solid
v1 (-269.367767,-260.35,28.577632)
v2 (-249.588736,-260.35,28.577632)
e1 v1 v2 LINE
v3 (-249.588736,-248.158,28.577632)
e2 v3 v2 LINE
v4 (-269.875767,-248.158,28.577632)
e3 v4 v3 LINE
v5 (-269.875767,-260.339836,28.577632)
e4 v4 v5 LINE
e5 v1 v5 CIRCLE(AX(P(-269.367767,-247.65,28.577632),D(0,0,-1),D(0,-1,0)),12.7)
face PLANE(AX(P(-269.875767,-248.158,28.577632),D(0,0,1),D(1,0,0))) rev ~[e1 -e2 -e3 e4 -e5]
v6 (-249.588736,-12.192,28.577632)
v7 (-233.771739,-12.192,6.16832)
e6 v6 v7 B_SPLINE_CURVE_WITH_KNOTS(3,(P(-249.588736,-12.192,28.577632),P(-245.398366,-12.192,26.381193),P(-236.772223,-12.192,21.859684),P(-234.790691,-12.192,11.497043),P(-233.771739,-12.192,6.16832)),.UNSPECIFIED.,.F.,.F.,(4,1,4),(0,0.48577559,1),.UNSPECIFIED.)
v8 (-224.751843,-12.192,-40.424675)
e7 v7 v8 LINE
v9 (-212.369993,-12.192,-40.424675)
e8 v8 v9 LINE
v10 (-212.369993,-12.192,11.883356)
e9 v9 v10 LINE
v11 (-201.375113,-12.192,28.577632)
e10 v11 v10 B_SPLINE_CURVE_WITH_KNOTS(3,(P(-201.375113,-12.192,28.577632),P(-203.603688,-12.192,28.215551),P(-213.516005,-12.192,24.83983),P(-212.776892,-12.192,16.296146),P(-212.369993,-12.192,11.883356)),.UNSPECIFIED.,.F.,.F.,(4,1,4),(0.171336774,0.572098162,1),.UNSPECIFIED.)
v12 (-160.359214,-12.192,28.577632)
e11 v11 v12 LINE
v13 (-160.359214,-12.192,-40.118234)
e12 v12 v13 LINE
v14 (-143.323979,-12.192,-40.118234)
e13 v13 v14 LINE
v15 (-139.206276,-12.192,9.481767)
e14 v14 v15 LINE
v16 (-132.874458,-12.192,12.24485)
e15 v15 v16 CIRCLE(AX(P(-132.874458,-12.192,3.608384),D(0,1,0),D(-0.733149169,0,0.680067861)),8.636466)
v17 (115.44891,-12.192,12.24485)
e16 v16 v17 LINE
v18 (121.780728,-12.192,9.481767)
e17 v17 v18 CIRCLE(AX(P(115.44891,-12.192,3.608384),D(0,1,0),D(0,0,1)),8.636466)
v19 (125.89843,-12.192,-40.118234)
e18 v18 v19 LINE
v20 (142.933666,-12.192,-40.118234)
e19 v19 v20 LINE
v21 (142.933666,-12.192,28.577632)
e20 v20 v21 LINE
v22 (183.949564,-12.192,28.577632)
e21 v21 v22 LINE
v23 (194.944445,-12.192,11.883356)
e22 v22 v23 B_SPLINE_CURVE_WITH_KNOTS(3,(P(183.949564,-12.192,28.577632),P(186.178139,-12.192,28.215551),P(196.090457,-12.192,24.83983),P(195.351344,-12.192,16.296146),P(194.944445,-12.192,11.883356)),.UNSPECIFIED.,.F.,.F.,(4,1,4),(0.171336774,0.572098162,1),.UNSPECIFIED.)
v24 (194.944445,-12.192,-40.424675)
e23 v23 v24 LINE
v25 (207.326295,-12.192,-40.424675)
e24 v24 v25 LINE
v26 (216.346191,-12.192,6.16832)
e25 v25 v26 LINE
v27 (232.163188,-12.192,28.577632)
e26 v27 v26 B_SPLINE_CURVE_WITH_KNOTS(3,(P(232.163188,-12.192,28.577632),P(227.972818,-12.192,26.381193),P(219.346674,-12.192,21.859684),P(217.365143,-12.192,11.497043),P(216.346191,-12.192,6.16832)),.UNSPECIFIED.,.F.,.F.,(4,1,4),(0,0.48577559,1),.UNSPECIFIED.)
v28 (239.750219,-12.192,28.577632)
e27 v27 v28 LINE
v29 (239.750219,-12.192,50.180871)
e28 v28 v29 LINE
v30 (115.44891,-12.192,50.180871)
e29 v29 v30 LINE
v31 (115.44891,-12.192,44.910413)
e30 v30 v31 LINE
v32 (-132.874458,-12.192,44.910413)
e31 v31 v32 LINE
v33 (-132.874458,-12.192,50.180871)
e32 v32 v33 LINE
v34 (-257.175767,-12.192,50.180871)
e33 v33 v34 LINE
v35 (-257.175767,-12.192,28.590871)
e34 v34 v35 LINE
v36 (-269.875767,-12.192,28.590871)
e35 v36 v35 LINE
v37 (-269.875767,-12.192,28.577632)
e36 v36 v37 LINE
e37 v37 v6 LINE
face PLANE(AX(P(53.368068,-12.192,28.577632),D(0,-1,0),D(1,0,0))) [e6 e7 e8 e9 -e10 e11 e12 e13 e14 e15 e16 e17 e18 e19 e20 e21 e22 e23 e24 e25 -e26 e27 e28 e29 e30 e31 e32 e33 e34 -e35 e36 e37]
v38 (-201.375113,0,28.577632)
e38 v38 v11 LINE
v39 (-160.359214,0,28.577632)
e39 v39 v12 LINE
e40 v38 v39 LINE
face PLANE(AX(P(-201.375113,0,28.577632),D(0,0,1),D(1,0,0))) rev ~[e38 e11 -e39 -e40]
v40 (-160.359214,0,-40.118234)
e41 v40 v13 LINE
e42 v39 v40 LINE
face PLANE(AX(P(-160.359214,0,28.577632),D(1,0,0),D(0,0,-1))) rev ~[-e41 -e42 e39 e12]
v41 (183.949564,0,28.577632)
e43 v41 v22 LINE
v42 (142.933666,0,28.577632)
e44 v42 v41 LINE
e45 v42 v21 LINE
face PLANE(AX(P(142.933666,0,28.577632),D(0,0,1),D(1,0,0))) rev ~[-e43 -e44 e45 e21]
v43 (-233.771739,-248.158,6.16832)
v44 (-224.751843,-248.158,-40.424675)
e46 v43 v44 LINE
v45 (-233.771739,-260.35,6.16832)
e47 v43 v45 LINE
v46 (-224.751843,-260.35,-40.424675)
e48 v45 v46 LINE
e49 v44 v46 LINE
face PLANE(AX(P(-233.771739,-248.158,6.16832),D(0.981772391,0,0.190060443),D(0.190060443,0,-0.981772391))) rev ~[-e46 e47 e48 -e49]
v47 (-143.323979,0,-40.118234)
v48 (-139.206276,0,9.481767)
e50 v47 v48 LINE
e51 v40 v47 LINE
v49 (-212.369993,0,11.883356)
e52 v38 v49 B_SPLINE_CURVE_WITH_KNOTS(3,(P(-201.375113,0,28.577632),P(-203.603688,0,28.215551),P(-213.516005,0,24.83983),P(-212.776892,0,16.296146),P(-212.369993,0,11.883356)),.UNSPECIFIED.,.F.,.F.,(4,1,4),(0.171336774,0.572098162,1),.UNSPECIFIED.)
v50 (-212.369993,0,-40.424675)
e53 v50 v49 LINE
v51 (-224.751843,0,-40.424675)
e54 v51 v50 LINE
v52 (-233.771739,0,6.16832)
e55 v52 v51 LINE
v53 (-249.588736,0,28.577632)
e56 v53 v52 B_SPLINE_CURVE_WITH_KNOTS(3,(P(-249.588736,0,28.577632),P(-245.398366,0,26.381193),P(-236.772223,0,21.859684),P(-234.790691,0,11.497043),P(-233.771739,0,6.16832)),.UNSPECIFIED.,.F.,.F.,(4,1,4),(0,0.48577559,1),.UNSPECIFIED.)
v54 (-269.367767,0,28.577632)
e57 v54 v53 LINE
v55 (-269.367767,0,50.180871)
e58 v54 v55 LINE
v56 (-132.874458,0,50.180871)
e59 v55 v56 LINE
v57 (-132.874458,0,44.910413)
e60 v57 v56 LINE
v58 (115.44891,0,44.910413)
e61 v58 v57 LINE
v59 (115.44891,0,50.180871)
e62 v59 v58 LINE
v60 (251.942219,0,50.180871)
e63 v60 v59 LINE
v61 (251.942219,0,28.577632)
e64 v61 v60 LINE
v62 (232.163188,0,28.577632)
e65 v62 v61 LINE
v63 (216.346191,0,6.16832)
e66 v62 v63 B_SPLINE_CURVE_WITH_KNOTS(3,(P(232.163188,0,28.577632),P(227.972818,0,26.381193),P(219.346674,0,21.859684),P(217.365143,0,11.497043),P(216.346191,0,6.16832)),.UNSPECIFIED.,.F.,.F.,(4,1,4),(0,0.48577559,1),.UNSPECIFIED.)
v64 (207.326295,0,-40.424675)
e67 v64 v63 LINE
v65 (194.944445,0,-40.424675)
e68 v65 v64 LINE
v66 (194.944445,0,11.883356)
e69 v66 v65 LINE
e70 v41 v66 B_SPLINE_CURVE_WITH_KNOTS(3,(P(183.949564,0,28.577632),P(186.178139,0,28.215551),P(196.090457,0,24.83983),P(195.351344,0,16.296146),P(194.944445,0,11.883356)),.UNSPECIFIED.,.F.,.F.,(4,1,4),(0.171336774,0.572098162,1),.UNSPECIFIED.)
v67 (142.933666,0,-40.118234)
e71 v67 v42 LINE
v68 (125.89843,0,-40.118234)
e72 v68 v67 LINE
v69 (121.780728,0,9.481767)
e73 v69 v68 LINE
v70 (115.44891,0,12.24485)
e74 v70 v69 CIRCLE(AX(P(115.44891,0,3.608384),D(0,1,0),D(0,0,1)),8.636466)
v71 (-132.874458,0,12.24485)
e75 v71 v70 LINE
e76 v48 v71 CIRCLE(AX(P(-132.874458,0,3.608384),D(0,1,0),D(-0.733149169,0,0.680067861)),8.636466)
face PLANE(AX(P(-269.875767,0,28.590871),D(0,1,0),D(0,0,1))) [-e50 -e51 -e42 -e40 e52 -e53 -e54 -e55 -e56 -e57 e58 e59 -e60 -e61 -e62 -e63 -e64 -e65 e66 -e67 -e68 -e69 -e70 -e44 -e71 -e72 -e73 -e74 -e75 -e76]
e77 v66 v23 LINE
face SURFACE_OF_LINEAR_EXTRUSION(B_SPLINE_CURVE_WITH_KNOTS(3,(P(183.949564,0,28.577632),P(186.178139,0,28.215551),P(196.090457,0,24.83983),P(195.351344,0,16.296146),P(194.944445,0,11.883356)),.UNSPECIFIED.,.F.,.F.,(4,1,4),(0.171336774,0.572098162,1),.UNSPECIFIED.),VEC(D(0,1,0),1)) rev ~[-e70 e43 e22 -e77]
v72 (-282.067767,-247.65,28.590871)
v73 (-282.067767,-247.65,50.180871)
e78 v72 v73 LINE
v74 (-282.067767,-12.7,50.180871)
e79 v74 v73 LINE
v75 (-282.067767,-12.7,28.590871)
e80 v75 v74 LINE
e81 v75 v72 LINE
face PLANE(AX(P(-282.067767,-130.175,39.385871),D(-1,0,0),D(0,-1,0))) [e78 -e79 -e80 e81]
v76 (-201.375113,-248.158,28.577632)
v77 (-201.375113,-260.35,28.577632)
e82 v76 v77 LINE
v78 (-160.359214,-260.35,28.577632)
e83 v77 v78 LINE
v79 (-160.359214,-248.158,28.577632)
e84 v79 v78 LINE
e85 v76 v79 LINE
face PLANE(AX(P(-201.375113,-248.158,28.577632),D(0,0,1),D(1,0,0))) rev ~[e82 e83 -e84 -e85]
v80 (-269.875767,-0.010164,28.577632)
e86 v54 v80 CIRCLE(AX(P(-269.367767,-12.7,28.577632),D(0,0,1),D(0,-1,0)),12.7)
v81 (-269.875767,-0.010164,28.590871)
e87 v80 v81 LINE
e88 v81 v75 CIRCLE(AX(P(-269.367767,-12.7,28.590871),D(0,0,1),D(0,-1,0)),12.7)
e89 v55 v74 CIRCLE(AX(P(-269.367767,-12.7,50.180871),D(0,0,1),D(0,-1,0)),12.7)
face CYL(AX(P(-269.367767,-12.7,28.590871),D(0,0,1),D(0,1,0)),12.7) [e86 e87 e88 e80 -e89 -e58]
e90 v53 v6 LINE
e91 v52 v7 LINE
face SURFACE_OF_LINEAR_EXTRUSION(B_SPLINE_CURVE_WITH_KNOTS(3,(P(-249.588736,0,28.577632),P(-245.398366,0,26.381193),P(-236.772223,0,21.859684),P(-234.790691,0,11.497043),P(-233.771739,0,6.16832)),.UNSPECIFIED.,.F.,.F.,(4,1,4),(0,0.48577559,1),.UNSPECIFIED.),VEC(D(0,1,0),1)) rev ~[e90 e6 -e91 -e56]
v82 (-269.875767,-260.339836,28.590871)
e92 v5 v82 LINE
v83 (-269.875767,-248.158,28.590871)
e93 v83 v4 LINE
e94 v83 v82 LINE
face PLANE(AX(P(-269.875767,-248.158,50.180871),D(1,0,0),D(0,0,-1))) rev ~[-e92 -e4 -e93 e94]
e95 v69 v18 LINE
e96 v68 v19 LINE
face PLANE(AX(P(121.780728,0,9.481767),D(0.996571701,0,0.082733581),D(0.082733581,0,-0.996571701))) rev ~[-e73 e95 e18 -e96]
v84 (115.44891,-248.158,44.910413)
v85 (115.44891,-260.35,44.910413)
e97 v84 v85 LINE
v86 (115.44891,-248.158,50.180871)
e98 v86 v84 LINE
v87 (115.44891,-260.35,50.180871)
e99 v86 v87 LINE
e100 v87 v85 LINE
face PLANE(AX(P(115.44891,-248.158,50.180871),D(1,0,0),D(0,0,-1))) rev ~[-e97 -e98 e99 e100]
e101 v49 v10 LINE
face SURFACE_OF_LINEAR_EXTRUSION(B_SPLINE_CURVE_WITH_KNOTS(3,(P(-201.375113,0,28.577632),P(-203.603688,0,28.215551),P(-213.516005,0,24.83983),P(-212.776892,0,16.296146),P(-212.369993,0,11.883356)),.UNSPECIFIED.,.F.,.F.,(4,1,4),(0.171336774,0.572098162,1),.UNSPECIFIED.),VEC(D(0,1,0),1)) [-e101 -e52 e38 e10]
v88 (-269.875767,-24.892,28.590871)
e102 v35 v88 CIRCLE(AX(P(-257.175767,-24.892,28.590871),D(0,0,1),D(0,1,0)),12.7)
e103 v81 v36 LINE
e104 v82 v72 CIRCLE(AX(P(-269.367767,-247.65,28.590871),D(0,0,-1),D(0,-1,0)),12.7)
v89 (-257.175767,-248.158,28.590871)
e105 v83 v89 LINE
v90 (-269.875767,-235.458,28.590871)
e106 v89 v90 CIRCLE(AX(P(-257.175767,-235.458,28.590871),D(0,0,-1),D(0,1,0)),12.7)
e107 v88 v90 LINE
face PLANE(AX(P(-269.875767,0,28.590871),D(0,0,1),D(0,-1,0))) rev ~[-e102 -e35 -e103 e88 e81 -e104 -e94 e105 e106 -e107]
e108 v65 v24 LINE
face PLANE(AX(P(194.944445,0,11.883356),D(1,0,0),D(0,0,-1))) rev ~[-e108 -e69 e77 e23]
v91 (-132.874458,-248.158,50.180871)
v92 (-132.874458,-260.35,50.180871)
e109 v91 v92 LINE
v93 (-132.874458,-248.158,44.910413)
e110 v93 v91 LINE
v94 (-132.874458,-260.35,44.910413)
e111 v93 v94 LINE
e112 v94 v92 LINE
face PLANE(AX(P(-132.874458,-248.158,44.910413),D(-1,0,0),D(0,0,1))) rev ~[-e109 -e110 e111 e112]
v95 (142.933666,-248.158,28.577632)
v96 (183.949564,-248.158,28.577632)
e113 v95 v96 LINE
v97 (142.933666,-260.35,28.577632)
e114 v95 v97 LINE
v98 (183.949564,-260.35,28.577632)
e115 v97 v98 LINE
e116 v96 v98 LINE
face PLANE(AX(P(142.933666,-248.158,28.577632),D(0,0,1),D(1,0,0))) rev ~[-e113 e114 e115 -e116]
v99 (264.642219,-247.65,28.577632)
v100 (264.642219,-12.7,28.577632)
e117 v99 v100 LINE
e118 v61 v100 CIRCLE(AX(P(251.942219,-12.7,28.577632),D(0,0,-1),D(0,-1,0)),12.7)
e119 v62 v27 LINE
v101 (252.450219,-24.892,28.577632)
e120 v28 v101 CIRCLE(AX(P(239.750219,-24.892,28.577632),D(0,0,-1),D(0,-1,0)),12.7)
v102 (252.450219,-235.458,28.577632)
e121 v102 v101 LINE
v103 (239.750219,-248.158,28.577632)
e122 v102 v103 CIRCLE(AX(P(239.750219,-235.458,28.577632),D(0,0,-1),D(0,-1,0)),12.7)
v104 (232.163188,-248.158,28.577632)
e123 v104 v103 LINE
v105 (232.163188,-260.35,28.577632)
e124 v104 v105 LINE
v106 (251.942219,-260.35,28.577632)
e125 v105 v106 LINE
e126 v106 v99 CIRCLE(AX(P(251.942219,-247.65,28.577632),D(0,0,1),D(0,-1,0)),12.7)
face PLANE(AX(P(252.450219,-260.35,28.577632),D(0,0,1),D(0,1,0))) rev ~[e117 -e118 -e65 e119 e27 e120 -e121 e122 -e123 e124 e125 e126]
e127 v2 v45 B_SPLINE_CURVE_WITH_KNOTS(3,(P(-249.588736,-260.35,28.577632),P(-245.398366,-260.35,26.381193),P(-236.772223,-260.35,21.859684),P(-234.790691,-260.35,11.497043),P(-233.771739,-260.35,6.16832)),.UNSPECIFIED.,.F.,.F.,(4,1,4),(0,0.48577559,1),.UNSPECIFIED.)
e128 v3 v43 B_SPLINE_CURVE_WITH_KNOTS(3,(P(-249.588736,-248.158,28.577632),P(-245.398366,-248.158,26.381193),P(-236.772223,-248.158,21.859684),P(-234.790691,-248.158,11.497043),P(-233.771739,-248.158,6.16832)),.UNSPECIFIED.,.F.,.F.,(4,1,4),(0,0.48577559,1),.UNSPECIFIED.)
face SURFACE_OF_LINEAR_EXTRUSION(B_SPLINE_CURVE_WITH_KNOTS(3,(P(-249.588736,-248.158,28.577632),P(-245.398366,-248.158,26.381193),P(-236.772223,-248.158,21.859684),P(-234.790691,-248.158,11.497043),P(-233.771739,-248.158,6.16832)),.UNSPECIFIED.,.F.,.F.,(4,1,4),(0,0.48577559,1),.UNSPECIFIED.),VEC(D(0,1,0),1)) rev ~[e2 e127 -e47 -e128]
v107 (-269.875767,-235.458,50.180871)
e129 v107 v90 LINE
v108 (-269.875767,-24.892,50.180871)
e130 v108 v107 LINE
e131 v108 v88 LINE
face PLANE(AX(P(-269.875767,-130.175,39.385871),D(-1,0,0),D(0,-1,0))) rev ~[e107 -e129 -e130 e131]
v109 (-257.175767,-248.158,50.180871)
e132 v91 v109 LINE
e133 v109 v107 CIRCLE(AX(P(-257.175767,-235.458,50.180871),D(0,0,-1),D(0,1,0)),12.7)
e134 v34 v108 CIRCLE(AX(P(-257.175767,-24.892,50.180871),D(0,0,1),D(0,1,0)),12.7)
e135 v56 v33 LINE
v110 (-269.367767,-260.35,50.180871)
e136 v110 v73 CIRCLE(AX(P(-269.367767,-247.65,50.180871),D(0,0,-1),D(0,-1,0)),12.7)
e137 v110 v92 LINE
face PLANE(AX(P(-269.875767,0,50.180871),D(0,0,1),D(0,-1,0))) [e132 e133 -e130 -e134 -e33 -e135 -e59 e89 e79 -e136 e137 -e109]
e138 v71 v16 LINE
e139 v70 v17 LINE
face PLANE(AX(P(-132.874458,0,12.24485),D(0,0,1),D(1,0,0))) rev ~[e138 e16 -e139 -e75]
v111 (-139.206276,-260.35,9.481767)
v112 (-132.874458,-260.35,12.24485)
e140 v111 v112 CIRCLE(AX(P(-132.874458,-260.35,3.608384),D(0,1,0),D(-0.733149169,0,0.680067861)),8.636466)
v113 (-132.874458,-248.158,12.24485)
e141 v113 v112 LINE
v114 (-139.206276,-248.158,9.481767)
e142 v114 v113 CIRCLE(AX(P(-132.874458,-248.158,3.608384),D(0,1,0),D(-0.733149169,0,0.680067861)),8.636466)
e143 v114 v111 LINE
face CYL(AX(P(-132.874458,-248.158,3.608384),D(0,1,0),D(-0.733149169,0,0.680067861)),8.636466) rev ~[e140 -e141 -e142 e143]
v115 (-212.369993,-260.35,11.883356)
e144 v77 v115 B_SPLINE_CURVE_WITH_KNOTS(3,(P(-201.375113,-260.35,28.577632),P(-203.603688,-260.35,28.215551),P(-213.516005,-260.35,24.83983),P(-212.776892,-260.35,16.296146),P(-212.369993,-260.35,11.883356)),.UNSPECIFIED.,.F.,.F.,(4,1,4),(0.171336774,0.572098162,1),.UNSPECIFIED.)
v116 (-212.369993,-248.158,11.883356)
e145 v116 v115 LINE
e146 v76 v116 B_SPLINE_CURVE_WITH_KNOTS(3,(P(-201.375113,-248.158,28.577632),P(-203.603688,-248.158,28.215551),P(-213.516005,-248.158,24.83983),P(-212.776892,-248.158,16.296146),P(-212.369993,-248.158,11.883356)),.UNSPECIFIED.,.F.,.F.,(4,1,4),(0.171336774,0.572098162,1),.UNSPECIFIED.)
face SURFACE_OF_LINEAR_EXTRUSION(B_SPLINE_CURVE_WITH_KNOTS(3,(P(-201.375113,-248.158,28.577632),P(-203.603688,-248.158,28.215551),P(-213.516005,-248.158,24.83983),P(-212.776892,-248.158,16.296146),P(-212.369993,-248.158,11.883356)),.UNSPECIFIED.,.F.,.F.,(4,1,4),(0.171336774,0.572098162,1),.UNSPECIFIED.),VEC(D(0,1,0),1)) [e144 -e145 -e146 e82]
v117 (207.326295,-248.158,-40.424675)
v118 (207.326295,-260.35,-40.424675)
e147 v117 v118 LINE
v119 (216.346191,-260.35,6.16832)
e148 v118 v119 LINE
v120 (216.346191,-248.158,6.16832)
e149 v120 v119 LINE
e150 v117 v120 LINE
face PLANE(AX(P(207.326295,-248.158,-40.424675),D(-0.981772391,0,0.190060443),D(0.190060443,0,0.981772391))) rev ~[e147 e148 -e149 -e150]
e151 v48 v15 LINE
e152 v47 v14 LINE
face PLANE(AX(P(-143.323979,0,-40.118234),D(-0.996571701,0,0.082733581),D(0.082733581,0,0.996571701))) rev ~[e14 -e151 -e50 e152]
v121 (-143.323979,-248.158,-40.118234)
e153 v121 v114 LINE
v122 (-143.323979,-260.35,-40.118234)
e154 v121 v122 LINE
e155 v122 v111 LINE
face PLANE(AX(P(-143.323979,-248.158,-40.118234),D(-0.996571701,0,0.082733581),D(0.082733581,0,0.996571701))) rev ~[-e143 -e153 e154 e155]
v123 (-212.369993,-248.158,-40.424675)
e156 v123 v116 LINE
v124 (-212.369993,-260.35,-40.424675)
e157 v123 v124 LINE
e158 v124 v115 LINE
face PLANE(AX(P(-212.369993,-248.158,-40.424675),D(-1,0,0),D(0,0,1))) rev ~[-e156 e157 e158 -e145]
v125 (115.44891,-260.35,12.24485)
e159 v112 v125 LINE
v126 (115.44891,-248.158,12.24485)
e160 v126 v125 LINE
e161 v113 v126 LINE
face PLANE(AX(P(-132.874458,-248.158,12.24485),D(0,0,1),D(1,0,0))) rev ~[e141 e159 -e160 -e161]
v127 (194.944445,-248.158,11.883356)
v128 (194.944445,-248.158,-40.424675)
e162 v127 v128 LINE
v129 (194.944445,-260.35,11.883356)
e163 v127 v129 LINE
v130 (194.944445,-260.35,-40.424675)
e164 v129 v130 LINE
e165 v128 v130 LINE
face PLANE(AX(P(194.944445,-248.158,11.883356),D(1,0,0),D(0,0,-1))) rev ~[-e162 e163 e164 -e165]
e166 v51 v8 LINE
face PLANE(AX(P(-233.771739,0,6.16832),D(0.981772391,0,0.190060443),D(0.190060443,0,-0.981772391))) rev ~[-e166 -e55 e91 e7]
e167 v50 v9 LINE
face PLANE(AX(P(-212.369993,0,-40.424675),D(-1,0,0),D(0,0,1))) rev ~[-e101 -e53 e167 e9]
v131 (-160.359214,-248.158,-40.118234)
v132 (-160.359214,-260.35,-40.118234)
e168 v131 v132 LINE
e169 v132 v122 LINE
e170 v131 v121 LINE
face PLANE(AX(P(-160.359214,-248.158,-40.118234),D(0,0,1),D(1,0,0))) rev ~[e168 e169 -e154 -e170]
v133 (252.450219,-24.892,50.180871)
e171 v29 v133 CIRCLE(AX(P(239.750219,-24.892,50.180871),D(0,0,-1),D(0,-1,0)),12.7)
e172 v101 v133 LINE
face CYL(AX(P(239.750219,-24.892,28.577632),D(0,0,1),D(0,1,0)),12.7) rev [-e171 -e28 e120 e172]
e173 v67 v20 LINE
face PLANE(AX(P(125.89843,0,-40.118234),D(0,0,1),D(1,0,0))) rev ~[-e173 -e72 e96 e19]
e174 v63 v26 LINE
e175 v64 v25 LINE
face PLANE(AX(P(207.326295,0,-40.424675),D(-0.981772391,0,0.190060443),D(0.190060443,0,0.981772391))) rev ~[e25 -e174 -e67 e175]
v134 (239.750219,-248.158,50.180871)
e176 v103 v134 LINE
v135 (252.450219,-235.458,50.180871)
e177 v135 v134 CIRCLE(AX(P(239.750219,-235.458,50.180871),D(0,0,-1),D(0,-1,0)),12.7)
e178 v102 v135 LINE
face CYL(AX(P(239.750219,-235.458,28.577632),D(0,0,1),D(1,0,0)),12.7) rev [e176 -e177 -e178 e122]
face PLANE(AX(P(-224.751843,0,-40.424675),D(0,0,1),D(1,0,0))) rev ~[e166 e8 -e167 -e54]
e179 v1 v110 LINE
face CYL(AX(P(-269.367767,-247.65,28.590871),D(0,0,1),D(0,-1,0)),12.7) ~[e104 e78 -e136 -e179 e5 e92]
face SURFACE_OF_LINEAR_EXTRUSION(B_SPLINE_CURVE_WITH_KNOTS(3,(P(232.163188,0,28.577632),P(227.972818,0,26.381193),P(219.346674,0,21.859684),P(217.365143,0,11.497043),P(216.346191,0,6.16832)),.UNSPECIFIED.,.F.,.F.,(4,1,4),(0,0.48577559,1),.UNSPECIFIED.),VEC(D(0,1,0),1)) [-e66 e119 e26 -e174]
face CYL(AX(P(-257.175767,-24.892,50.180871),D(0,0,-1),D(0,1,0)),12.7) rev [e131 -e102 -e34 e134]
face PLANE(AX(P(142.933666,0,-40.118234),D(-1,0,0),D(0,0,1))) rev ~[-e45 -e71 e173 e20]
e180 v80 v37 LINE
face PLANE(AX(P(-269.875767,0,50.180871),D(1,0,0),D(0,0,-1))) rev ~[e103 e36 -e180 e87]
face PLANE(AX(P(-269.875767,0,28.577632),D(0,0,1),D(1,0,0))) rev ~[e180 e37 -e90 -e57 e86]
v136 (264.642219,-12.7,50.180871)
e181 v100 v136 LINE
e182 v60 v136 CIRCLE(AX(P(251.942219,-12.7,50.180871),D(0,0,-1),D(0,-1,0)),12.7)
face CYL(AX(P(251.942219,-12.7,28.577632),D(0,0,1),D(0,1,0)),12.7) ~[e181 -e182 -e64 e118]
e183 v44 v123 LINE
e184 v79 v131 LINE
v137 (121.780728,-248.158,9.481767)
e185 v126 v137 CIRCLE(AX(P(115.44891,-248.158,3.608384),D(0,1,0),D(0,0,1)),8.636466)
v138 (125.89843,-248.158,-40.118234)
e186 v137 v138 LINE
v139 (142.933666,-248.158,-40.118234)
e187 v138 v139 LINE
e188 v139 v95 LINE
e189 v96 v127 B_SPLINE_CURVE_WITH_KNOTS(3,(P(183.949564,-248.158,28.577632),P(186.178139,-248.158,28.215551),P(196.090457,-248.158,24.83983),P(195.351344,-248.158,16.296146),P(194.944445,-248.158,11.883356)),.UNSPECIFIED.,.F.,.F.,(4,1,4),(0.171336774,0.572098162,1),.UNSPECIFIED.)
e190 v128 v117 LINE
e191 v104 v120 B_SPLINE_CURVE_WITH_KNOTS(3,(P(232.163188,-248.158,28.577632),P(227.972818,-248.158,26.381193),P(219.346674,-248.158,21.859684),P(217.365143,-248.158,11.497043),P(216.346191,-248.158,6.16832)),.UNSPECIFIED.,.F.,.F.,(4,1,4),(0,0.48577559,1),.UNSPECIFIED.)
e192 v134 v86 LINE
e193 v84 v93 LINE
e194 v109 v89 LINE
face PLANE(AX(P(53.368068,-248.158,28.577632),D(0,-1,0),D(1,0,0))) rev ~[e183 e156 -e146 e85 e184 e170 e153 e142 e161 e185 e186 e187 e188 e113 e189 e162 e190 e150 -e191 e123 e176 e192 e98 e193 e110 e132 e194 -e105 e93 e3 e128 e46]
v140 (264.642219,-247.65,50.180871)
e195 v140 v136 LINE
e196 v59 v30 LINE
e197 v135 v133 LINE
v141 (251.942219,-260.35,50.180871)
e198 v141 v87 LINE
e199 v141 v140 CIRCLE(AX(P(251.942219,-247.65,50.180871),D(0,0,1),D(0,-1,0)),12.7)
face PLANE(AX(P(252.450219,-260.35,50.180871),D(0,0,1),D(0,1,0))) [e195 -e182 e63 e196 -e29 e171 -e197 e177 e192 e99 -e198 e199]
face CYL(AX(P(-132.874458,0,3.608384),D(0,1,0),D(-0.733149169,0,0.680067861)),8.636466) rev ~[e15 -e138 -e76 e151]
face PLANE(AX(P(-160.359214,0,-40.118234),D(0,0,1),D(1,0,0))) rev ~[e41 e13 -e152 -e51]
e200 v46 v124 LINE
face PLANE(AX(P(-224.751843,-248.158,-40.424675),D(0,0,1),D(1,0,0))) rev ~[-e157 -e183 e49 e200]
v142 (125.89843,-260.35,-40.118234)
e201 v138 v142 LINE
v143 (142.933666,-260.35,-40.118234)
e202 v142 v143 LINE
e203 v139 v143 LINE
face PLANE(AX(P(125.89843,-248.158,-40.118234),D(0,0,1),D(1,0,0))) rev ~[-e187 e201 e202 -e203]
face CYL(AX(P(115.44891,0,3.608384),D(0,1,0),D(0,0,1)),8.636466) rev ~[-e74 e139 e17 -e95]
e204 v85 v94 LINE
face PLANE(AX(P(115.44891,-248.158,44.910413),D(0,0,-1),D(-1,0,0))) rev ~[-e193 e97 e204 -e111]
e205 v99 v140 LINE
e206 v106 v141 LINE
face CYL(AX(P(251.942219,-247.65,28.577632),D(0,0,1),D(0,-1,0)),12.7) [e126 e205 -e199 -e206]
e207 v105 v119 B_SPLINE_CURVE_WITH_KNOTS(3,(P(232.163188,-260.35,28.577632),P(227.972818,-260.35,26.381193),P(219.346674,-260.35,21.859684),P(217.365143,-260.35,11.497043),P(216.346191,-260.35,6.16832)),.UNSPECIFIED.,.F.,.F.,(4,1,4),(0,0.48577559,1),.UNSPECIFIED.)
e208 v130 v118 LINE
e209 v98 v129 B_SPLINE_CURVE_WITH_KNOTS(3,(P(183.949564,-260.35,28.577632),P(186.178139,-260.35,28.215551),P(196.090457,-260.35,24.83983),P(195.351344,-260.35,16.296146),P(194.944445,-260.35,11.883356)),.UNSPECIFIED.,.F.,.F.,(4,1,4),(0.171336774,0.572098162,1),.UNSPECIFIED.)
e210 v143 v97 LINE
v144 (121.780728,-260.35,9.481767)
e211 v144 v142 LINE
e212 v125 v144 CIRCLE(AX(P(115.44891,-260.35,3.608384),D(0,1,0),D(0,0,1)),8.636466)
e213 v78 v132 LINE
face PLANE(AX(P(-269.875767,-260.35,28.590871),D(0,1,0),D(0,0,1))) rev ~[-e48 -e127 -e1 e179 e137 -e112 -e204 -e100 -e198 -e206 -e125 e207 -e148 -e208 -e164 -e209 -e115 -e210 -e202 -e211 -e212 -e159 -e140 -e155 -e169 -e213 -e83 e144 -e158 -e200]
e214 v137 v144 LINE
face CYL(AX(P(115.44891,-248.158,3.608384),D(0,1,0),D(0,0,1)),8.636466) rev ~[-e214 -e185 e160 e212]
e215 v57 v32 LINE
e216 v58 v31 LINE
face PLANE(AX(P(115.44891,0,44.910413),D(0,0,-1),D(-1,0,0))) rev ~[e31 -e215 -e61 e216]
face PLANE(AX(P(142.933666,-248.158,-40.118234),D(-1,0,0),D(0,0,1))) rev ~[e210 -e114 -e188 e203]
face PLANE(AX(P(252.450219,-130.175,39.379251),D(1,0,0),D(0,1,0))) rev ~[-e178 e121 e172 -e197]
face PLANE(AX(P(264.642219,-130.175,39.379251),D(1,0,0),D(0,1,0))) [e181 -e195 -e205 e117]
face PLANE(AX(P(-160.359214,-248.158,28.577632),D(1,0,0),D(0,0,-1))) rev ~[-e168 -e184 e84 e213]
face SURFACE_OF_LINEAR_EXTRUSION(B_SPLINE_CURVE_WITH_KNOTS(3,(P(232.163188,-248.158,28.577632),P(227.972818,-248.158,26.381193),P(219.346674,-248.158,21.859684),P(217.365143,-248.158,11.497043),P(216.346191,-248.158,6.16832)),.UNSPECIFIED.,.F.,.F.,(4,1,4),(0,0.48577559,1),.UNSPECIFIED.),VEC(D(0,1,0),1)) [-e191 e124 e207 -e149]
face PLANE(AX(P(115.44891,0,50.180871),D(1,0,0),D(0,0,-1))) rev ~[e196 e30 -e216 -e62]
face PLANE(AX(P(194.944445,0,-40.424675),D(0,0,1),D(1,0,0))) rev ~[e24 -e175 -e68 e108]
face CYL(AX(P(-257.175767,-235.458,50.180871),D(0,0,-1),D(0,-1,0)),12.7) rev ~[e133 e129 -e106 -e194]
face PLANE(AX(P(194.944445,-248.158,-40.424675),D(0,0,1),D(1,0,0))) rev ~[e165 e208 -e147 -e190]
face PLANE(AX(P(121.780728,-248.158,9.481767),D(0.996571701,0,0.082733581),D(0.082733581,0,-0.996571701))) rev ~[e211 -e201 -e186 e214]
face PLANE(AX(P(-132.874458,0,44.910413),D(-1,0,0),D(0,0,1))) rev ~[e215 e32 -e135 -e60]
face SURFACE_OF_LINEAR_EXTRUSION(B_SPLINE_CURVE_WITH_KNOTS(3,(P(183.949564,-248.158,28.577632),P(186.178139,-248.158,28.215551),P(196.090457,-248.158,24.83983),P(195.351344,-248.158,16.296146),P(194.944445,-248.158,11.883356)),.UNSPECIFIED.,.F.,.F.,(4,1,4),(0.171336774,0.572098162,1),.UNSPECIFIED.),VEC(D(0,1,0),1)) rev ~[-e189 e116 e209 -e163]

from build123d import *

# Parameters (mm, degrees)
F1_DEPTH = 12.192
F3_W     = 260.35
F3_H     = 21.6032387971
F4_DEPTH = 12.192
F5_W     = 260.35
F5_H     = 21.59
F6_DEPTH = 12.192
F7_R     = 12.7


with BuildPart() as f1:
    # F0 (on Front) → F1 (new body)
    with BuildSketch(Plane.XZ):
        Polygon((115.4489097687, 44.9104134451), (-8.7127741426, 44.9104134451), (-8.7127741426, 12.2448502547), (115.4489097687, 12.2448502547), (115.4489097687, 28.5776318499), align=None)
        with BuildLine():
            add(Edge.make_bspline(
                [(-201.3751125628, 28.5776318499), (-203.6036875056, 28.2155507261), (-213.5160050083, 24.8398299044), (-212.7768922816, 16.2961456434), (-212.3699930733, 11.8833564186)],
                knots=[0.1713367735, 0.1713367735, 0.1713367735, 0.1713367735, 0.5720981619, 1, 1, 1, 1], degree=3))
            Line((-201.3751125628, 28.5776318499), (-249.5887362649, 28.5776318499))
            add(Edge.make_bspline(
                [(-249.5887362649, 28.5776318499), (-245.3983662499, 26.3811930315), (-236.7722226078, 21.8596837899), (-234.7906912251, 11.49704289), (-233.7717394185, 6.1683199847)],
                knots=[0, 0, 0, 0, 0.4857755898, 1, 1, 1, 1], degree=3))
            Line((-233.7717394185, 6.1683199847), (-224.7518429065, -40.4246754655))
            Line((-224.7518429065, -40.4246754655), (-212.3699930733, -40.4246754655))
            Line((-212.3699930733, -40.4246754655), (-212.3699930733, 11.8833564186))
        make_face()
        with BuildLine():
            add(Edge.make_bspline(
                [(232.1631879797, 28.5776318499), (227.9728179646, 26.3811930315), (219.3466743226, 21.8596837899), (217.3651429399, 11.49704289), (216.3461911332, 6.1683199847)],
                knots=[0, 0, 0, 0, 0.4857755898, 1, 1, 1, 1], degree=3))
            Line((232.1631879797, 28.5776318499), (183.9495642776, 28.5776318499))
            add(Edge.make_bspline(
                [(183.9495642776, 28.5776318499), (186.1781392203, 28.2155507261), (196.0904567231, 24.8398299044), (195.3513439963, 16.2961456434), (194.944444788, 11.8833564186)],
                knots=[0.1713367735, 0.1713367735, 0.1713367735, 0.1713367735, 0.5720981619, 1, 1, 1, 1], degree=3))
            Line((194.944444788, 11.8833564186), (194.944444788, -40.4246754655))
            Line((194.944444788, -40.4246754655), (207.3262946213, -40.4246754655))
            Line((207.3262946213, -40.4246754655), (216.3461911332, 6.1683199847))
        make_face()
        with BuildLine():
            Line((-132.874458054, 12.2448502547), (-132.874458054, 28.5776318499))
            Line((-132.874458054, 28.5776318499), (-160.3592138582, 28.5776318499))
            Line((-160.3592138582, 28.5776318499), (-160.3592138582, -40.1182342476))
            Line((-160.3592138582, -40.1182342476), (-143.3239786863, -40.1182342476))
            Line((-143.3239786863, -40.1182342476), (-139.2062762381, 9.481767078))
            ThreePointArc((-139.2062762381, 9.481767078), (-136.3286783046, 11.5239959202), (-132.874458054, 12.2448502547))
        make_face()
        with BuildLine():
            Line((115.4489097687, 28.5776318499), (115.4489097687, 12.2448502547))
            ThreePointArc((115.4489097687, 12.2448502547), (118.9031300193, 11.5239959202), (121.7807279529, 9.481767078))
            Line((121.7807279529, 9.481767078), (125.898430401, -40.1182342476))
            Line((125.898430401, -40.1182342476), (142.933665573, -40.1182342476))
            Line((142.933665573, -40.1182342476), (142.933665573, 28.5776318499))
            Line((142.933665573, 28.5776318499), (115.4489097687, 28.5776318499))
        make_face()
        with BuildLine():
            Line((115.4489097687, 50.180870647), (115.4489097687, 44.9104134451))
            Line((115.4489097687, 44.9104134451), (115.4489097687, 28.5776318499))
            Line((115.4489097687, 28.5776318499), (142.933665573, 28.5776318499))
            Line((142.933665573, 28.5776318499), (182.0295738914, 28.5776318499))
            add(Edge.make_bspline(
                [(182.0295738914, 28.5776318499), (182.5128861487, 28.6550095059), (182.9967857635, 28.7324317216), (183.9495642776, 28.5776318499)],
                knots=[0, 0, 0, 0, 0.1713367735, 0.1713367735, 0.1713367735, 0.1713367735], degree=3))
            Line((183.9495642776, 28.5776318499), (232.1631879797, 28.5776318499))
            Line((232.1631879797, 28.5776318499), (252.4502187865, 28.5776318499))
            Line((252.4502187865, 28.5776318499), (252.4502187865, 50.180870647))
            Line((252.4502187865, 50.180870647), (115.4489097687, 50.180870647))
        make_face()
        Polygon((-8.7127741426, 44.9104134451), (-132.874458054, 44.9104134451), (-132.874458054, 28.5776318499), (-132.874458054, 12.2448502547), (-8.7127741426, 12.2448502547), align=None)
        with BuildLine():
            Line((-132.874458054, 28.5776318499), (-132.874458054, 44.9104134451))
            Line((-132.874458054, 44.9104134451), (-132.874458054, 50.180870647))
            Line((-132.874458054, 50.180870647), (-269.8757670717, 50.180870647))
            Line((-269.8757670717, 50.180870647), (-269.8757670717, 28.5776318499))
            Line((-269.8757670717, 28.5776318499), (-249.5887362649, 28.5776318499))
            Line((-249.5887362649, 28.5776318499), (-201.3751125628, 28.5776318499))
            add(Edge.make_bspline(
                [(-199.4551221767, 28.5776318499), (-199.9384344339, 28.6550095059), (-200.4223340487, 28.7324317216), (-201.3751125628, 28.5776318499)],
                knots=[0, 0, 0, 0, 0.1713367735, 0.1713367735, 0.1713367735, 0.1713367735], degree=3))
            Line((-199.4551221767, 28.5776318499), (-160.3592138582, 28.5776318499))
            Line((-160.3592138582, 28.5776318499), (-132.874458054, 28.5776318499))
        make_face()
        with BuildLine():
            add(Edge.make_bspline(
                [(182.0295738914, 28.5776318499), (182.5128861487, 28.6550095059), (182.9967857635, 28.7324317216), (183.9495642776, 28.5776318499)],
                knots=[0, 0, 0, 0, 0.1713367735, 0.1713367735, 0.1713367735, 0.1713367735], degree=3))
            Line((182.0295738914, 28.5776318499), (183.9495642776, 28.5776318499))
        make_face()
        with BuildLine():
            Line((-201.3751125628, 28.5776318499), (-199.4551221767, 28.5776318499))
            add(Edge.make_bspline(
                [(-199.4551221767, 28.5776318499), (-199.9384344339, 28.6550095059), (-200.4223340487, 28.7324317216), (-201.3751125628, 28.5776318499)],
                knots=[0, 0, 0, 0, 0.1713367735, 0.1713367735, 0.1713367735, 0.1713367735], degree=3))
        make_face()
    extrude(amount=F1_DEPTH)


with BuildPart() as f2_1:
    # F2: copy of F1
    add(f1.part.moved(Location((0, -248.158, 0))))


with BuildPart() as f1_1:
    add(f1.part)

    add(f2_1.part)  # F4 merges F2_1
    # F3 (on face) → F4 (join)
    with BuildSketch(Plane.YZ.offset(252.4502187865)):
        with Locations((-130.175, 39.3792512485)):
            Rectangle(F3_W, F3_H)
    extrude(amount=F4_DEPTH)

    # F5 (on face) → F6 (join)
    with BuildSketch(Plane(origin=(-269.8757670717, 0, 0), x_dir=(0, -1, 0), z_dir=(-1, 0, 0))):
        with Locations((130.175, 39.385870647)):
            Rectangle(F5_W, F5_H)
    extrude(amount=F6_DEPTH)

    # F7
    f7_edges = [f1_1.edges().sort_by_distance(p)[0] for p in [
        (264.642219, -260.35, 39.379251),
        (264.642219, 0, 39.379251),
        (-282.067767, 0, 39.385871),
        (-282.067767, -260.35, 39.385871),
        (252.450219, -12.192, 39.379251),
        (252.450219, -248.158, 39.379251),
        (-269.875767, -248.158, 39.385871),
        (-269.875767, -12.192, 39.385871),
    ]]
    fillet(f7_edges, radius=F7_R)


solid = f1_1.part
